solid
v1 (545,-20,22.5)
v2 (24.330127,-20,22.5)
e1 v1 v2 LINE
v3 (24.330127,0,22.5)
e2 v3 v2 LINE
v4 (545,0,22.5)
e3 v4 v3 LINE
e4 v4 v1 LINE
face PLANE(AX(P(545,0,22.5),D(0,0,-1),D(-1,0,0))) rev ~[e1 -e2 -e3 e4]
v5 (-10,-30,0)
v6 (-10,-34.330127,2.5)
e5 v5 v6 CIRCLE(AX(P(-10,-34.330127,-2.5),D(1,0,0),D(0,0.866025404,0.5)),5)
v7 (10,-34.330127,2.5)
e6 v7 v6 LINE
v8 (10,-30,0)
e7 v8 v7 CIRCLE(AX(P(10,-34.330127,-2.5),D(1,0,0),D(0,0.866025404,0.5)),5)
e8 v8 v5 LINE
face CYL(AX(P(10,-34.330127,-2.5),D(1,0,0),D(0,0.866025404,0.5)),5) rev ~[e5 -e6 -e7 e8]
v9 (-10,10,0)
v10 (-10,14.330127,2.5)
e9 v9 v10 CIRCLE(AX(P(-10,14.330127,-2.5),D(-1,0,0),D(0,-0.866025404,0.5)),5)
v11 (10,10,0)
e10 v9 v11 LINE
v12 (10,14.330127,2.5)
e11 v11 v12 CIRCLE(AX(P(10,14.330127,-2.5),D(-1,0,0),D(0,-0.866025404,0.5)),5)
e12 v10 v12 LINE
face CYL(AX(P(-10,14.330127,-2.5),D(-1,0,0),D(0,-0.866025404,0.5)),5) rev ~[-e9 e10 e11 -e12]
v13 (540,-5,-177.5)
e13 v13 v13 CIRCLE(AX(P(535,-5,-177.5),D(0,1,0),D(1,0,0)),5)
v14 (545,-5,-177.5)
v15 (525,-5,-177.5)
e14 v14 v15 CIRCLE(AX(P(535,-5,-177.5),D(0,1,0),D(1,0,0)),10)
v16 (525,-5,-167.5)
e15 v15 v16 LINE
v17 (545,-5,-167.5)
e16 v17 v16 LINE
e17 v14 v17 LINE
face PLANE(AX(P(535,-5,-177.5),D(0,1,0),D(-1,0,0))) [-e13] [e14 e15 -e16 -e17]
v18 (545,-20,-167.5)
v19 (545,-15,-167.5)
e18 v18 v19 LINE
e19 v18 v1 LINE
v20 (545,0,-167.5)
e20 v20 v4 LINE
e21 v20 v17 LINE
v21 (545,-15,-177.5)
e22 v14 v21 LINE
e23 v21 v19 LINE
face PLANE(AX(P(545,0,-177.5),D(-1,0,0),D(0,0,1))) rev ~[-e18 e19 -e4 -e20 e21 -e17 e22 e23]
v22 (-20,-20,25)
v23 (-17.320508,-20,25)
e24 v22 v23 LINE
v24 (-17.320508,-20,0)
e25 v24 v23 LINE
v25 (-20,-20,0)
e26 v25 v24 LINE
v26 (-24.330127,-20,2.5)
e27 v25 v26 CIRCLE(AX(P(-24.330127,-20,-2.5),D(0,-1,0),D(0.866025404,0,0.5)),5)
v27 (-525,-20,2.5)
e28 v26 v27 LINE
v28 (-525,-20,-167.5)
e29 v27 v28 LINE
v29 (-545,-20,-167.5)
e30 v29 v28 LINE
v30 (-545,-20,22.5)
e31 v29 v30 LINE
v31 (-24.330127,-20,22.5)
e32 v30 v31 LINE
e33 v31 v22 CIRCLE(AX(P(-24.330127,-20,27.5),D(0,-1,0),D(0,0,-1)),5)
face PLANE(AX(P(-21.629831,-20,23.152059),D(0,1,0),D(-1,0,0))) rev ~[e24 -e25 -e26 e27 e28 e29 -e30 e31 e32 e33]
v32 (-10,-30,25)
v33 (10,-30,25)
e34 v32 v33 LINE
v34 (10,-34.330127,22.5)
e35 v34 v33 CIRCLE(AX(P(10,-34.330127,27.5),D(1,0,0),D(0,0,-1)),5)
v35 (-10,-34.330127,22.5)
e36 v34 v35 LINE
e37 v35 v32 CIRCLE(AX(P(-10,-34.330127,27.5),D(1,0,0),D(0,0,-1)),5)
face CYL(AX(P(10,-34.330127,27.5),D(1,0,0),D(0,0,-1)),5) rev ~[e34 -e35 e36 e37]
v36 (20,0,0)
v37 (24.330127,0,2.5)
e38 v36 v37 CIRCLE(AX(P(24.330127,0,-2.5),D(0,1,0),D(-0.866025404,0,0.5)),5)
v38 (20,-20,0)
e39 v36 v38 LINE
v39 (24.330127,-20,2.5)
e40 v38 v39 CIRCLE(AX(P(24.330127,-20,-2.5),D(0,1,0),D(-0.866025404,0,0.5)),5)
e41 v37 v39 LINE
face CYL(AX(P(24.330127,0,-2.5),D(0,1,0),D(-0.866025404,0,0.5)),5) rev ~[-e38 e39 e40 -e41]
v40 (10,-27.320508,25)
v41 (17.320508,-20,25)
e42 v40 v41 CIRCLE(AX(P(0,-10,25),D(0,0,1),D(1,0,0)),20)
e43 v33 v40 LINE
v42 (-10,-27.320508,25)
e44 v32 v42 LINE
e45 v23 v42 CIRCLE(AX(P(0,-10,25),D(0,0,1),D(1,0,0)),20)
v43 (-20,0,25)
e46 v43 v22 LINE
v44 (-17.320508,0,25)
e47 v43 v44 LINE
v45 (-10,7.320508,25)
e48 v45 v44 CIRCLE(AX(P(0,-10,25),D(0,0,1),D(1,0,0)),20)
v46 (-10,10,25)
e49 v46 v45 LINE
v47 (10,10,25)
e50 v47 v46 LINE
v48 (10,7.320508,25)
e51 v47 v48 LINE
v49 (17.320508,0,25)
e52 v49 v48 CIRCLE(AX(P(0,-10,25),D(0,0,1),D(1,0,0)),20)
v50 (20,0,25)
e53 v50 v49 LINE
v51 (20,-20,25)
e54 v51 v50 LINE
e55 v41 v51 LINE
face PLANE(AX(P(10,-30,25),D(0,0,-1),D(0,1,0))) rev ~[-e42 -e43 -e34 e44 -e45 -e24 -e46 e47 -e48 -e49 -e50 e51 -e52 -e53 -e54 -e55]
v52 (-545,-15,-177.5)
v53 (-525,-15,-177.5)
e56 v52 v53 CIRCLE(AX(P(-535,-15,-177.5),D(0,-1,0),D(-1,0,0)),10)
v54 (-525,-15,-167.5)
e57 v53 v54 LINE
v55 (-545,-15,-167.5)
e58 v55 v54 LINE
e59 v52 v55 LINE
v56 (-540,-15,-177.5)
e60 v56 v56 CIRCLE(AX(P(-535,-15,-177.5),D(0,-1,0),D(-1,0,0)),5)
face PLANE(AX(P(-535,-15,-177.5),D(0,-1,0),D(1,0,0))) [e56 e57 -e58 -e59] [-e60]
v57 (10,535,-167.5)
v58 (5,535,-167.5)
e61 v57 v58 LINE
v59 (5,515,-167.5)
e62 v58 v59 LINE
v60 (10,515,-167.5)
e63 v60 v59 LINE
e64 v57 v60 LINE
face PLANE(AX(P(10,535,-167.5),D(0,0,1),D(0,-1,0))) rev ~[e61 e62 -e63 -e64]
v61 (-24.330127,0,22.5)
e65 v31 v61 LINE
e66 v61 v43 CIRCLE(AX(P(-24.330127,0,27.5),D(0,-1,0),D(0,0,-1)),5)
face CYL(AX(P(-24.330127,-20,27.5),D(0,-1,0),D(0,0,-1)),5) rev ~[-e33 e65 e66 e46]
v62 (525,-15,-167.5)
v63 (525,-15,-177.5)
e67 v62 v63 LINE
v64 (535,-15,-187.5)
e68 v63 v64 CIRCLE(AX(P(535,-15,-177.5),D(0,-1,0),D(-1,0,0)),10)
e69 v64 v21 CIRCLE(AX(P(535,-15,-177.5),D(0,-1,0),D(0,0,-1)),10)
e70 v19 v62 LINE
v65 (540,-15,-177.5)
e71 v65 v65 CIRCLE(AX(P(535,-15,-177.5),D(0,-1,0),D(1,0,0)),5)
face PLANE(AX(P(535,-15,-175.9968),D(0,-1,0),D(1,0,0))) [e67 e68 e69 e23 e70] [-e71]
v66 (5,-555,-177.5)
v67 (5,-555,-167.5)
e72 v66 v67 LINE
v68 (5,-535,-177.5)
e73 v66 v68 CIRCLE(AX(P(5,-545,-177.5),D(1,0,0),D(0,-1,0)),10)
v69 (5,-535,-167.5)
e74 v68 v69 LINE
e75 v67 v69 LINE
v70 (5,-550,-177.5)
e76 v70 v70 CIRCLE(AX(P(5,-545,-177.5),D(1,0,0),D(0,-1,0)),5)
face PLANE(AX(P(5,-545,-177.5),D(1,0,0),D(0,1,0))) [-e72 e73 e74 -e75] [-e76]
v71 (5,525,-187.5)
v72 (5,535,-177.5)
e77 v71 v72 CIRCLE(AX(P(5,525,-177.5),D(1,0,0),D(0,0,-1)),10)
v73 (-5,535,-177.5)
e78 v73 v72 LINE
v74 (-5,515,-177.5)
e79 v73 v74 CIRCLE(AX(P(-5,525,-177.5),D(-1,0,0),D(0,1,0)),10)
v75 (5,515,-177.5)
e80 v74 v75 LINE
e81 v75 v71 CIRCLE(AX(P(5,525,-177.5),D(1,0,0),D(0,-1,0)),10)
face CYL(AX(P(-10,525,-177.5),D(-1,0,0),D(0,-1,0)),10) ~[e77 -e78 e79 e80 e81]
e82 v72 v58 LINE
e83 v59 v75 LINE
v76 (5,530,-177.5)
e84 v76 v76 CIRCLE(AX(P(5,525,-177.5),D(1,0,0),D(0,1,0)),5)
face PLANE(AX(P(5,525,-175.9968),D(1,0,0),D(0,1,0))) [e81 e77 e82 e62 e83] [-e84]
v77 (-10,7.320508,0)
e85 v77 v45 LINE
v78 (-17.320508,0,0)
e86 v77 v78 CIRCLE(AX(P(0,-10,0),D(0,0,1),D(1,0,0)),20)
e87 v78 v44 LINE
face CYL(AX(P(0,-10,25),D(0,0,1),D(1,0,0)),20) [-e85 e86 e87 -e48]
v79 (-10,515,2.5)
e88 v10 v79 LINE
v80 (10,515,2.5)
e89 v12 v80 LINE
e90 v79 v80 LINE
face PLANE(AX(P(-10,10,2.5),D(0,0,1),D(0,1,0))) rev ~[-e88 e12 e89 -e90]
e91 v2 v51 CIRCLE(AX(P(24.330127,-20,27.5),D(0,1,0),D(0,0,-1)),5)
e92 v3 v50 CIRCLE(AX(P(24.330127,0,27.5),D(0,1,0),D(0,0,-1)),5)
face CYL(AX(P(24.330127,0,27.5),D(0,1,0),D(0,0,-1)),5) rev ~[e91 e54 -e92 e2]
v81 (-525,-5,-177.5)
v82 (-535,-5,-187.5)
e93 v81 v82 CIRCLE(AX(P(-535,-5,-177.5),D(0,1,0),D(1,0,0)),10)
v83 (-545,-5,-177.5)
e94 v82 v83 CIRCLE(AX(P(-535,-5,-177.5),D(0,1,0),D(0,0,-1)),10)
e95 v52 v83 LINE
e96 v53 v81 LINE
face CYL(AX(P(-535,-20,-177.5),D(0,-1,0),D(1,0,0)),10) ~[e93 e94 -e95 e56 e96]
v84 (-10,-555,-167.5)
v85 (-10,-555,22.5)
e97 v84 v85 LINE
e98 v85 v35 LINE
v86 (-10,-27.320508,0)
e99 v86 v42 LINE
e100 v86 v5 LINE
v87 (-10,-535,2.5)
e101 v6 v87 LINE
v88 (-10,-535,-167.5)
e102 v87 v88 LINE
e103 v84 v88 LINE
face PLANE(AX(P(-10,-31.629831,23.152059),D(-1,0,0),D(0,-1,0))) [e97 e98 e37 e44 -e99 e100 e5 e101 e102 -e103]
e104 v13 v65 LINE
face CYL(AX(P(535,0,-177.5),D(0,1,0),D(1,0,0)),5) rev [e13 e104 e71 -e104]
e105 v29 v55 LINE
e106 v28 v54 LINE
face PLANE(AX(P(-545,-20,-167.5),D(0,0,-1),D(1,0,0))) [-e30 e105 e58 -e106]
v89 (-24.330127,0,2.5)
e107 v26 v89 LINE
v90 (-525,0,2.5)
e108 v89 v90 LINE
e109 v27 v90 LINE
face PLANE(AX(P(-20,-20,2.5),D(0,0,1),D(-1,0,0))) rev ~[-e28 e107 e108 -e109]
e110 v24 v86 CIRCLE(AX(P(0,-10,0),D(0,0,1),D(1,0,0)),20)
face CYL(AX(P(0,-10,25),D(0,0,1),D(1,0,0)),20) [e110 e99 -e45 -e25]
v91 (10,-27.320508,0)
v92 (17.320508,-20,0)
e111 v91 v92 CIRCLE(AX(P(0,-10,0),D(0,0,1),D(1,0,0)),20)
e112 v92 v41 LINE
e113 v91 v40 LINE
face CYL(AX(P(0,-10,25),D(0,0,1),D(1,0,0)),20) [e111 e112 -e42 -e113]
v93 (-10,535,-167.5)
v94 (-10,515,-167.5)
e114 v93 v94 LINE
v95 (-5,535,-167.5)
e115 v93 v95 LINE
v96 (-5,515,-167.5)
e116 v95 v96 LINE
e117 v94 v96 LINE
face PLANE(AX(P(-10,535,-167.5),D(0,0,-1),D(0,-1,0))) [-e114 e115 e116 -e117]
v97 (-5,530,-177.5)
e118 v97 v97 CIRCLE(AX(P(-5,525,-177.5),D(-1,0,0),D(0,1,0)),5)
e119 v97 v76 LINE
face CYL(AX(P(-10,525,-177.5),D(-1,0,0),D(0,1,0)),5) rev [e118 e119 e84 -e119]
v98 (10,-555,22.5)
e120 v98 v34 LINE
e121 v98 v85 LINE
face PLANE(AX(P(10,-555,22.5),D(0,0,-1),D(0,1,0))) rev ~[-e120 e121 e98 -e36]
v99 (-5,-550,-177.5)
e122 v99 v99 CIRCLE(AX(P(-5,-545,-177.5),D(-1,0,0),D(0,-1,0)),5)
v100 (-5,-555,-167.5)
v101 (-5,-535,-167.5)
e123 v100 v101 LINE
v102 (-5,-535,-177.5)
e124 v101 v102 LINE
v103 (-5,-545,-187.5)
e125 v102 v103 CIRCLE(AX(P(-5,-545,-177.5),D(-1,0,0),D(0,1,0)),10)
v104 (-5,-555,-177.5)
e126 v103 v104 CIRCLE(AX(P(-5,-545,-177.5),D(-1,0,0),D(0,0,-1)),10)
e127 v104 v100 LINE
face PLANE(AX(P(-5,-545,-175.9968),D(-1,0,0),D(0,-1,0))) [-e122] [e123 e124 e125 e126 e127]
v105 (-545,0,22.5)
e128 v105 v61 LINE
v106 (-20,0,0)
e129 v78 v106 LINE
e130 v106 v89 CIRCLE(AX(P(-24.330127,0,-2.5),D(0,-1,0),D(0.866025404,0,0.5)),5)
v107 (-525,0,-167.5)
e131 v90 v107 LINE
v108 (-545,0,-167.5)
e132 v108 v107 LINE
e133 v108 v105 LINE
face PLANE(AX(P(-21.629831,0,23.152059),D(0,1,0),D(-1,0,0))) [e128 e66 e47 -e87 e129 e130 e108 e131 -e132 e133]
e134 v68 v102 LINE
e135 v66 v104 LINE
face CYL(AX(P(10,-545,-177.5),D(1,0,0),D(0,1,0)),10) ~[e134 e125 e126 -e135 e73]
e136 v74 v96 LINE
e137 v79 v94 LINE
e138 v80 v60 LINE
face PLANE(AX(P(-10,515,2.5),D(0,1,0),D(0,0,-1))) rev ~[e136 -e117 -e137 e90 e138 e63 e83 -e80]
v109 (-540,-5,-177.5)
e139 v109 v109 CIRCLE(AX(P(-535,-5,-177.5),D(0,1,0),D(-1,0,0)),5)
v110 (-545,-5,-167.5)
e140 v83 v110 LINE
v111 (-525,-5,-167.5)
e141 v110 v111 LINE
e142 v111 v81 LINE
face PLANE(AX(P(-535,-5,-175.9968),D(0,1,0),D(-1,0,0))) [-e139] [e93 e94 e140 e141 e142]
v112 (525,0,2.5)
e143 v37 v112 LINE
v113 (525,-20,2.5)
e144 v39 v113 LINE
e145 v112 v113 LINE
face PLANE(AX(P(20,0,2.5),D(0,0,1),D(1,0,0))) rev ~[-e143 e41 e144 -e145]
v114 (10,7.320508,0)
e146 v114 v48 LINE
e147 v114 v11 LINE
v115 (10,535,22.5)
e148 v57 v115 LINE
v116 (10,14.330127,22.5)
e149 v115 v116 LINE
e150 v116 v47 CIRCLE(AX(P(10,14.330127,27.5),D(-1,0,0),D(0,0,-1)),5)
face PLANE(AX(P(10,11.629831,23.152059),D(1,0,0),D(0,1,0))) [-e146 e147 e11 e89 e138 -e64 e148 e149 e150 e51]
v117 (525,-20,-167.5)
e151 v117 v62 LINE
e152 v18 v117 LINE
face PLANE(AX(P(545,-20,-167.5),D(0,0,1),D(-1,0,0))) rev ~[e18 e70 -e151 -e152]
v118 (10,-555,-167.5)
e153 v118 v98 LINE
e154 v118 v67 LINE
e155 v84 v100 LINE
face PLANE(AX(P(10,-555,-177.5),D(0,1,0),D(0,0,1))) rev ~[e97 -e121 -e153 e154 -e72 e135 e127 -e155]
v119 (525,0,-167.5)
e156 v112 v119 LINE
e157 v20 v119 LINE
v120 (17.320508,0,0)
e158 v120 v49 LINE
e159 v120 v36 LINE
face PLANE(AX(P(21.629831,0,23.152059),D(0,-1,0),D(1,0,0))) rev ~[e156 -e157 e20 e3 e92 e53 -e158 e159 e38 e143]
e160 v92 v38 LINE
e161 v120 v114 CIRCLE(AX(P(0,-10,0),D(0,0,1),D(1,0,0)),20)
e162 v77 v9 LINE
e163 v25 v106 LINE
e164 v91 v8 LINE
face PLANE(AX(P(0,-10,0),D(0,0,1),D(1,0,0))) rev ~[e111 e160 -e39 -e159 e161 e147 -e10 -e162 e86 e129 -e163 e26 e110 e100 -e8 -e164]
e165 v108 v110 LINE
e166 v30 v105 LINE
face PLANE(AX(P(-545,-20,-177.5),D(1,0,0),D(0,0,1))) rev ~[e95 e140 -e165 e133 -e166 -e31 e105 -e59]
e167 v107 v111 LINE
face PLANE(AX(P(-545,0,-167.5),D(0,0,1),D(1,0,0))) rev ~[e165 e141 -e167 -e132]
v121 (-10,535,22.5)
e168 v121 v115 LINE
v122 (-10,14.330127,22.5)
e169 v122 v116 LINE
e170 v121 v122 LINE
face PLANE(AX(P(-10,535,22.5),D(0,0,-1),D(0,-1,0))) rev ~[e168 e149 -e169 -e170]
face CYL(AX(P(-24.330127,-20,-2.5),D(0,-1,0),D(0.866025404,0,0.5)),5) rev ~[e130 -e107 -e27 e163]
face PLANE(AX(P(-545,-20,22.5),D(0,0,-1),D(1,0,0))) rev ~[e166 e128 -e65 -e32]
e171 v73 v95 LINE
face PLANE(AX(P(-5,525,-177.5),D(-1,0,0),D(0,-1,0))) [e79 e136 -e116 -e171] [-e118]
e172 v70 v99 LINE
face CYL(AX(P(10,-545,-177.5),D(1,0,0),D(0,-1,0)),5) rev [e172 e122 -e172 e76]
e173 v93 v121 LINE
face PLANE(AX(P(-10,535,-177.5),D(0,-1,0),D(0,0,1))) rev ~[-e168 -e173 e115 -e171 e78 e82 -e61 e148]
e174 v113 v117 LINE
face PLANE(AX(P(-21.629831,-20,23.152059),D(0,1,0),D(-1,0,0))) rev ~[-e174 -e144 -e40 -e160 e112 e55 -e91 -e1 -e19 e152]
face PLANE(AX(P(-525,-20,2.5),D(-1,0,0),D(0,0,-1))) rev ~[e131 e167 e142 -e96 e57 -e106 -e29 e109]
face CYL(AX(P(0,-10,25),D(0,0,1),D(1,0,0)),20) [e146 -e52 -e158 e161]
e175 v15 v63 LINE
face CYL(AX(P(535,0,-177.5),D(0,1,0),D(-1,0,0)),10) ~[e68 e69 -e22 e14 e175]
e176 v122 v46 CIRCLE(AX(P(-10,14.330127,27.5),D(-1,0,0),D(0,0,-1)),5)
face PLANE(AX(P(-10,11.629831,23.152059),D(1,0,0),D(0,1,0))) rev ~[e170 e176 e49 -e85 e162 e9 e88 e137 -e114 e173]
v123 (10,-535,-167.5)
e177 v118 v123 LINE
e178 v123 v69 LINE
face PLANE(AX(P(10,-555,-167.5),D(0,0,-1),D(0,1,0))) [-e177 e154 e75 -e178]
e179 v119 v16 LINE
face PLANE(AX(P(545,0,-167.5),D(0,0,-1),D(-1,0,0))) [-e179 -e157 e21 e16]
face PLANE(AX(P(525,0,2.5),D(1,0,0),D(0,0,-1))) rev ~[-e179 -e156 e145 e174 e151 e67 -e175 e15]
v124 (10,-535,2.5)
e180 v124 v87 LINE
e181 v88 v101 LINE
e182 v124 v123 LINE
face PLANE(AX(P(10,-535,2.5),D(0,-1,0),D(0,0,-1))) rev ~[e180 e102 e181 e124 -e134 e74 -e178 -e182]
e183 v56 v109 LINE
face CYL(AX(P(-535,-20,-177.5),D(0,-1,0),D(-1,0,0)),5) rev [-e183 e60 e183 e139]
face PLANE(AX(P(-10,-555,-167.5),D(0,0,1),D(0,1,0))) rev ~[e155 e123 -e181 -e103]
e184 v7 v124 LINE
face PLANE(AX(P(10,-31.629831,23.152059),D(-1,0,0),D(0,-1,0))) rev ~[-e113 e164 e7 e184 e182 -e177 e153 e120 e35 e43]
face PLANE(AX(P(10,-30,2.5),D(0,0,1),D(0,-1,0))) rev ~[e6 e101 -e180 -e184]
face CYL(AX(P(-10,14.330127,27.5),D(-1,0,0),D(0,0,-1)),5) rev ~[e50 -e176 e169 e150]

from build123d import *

# Parameters (mm, degrees)
F0_R            = 5
F1_DEPTH        = 20
F2_T1_DEPTH     = 20
F4_COUNT        = 4
F3_R            = 20
F5_DEPTH        = 25
F6_R            = 5
F7_DEPTH        = 5
F7_COPIES_COUNT = 4
F8_W            = 20
F8_H            = 20
F9_DEPTH        = 5
F9_COPIES_COUNT = 4


# Not quite as in the source:
# - a fillet or chamfer that OpenCascade refuses, or shapes differently, is made with other operations: its cross-section is extruded or revolved along the edge and cut away or added
# - a pattern or mirror of a feature is missing from the dataset's text; its kind, count and spacing are read off the source's solid


with BuildPart() as f1:
    # F0 (on Front) → F1 (new body)
    with BuildSketch(Plane.XZ):
        with BuildLine():
            Line((0, 25), (0, 0))
            Line((0, 0), (20, 0))
            Line((20, 0), (20, 2.5))
            Line((20, 2.5), (525, 2.5))
            Line((525, 2.5), (525, -177.5))
            ThreePointArc((525, -177.5), (535, -187.5), (545, -177.5))
            Line((545, -177.5), (545, 22.5))
            Line((545, 22.5), (20, 22.5))
            Line((20, 22.5), (20, 25))
            Line((20, 25), (0, 25))
        make_face()
        with Locations((535, -177.5)):
            Circle(F0_R, mode=Mode.SUBTRACT)
    extrude(amount=F1_DEPTH)

    # F2: fillet of radius 5 on 2 edges, made by hand

    # F2_s2 → F2_t1 (join)
    with BuildSketch(Plane.XZ):
        with BuildLine():
            ThreePointArc((24.3301270189, 22.5), (21.8301270189, 23.1698729811), (20, 25))
            Line((20, 25), (20, 22.5))
            Line((20, 22.5), (24.3301270189, 22.5))
        make_face()
        with BuildLine():
            ThreePointArc((20, 0), (21.8301270189, 1.8301270189), (24.3301270189, 2.5))
            Line((24.3301270189, 2.5), (20, 2.5))
            Line((20, 2.5), (20, 0))
        make_face()
    extrude(amount=F2_T1_DEPTH)

    # F4: F1 ×4 about axis
    f4_axis = Axis((0, -10, 25), (0, 0, 1))


with BuildPart() as f1_1:
    add(f1.part)
    for i in range(1, F4_COUNT):
        add(f1.part.rotate(f4_axis, i * 360 / F4_COUNT))

    # F3 (on face) → F5 (join, through all)
    with BuildSketch(Plane.XY.offset(25)):
        with Locations((0, -10)):
            Circle(F3_R)
    extrude(amount=-F5_DEPTH)

    # F6 (on face) → F7 (cut)
    with BuildSketch(Plane(origin=(-10, 0, 0), x_dir=(0, -1, 0), z_dir=(-1, 0, 0))):
        with BuildLine():
            Line((555, -177.5), (555, -167.5))
            Line((555, -167.5), (535, -167.5))
            Line((535, -167.5), (535, -177.5))
            ThreePointArc((535, -177.5), (537.9289321881, -184.5710678119), (545, -187.5))
            ThreePointArc((545, -187.5), (552.0710678119, -184.5710678119), (555, -177.5))
        make_face()
        with Locations((545, -177.5)):
            Circle(F6_R, mode=Mode.SUBTRACT)
    f7 = extrude(amount=-F7_DEPTH, mode=Mode.SUBTRACT)

    # F7_copies: F7 ×4 about axis
    f7_copies_axis = Axis((0, -10, 0), (0, 0, 1))
    for i in range(1, F7_COPIES_COUNT):
        add(f7.rotate(f7_copies_axis, i * 360 / F7_COPIES_COUNT), mode=Mode.SUBTRACT)

    # F8 (on face) → F9 (cut)
    with BuildSketch(Plane.YZ.offset(10)):
        with Locations((-545, -177.5)):
            Rectangle(F8_W, F8_H)
    f9 = extrude(amount=-F9_DEPTH, mode=Mode.SUBTRACT)

    # F9_copies: F9 ×4 about axis
    f9_copies_axis = Axis((0, -10, 0), (0, 0, 1))
    for i in range(1, F9_COPIES_COUNT):
        add(f9.rotate(f9_copies_axis, i * 360 / F9_COPIES_COUNT), mode=Mode.SUBTRACT)


solid = f1_1.part
